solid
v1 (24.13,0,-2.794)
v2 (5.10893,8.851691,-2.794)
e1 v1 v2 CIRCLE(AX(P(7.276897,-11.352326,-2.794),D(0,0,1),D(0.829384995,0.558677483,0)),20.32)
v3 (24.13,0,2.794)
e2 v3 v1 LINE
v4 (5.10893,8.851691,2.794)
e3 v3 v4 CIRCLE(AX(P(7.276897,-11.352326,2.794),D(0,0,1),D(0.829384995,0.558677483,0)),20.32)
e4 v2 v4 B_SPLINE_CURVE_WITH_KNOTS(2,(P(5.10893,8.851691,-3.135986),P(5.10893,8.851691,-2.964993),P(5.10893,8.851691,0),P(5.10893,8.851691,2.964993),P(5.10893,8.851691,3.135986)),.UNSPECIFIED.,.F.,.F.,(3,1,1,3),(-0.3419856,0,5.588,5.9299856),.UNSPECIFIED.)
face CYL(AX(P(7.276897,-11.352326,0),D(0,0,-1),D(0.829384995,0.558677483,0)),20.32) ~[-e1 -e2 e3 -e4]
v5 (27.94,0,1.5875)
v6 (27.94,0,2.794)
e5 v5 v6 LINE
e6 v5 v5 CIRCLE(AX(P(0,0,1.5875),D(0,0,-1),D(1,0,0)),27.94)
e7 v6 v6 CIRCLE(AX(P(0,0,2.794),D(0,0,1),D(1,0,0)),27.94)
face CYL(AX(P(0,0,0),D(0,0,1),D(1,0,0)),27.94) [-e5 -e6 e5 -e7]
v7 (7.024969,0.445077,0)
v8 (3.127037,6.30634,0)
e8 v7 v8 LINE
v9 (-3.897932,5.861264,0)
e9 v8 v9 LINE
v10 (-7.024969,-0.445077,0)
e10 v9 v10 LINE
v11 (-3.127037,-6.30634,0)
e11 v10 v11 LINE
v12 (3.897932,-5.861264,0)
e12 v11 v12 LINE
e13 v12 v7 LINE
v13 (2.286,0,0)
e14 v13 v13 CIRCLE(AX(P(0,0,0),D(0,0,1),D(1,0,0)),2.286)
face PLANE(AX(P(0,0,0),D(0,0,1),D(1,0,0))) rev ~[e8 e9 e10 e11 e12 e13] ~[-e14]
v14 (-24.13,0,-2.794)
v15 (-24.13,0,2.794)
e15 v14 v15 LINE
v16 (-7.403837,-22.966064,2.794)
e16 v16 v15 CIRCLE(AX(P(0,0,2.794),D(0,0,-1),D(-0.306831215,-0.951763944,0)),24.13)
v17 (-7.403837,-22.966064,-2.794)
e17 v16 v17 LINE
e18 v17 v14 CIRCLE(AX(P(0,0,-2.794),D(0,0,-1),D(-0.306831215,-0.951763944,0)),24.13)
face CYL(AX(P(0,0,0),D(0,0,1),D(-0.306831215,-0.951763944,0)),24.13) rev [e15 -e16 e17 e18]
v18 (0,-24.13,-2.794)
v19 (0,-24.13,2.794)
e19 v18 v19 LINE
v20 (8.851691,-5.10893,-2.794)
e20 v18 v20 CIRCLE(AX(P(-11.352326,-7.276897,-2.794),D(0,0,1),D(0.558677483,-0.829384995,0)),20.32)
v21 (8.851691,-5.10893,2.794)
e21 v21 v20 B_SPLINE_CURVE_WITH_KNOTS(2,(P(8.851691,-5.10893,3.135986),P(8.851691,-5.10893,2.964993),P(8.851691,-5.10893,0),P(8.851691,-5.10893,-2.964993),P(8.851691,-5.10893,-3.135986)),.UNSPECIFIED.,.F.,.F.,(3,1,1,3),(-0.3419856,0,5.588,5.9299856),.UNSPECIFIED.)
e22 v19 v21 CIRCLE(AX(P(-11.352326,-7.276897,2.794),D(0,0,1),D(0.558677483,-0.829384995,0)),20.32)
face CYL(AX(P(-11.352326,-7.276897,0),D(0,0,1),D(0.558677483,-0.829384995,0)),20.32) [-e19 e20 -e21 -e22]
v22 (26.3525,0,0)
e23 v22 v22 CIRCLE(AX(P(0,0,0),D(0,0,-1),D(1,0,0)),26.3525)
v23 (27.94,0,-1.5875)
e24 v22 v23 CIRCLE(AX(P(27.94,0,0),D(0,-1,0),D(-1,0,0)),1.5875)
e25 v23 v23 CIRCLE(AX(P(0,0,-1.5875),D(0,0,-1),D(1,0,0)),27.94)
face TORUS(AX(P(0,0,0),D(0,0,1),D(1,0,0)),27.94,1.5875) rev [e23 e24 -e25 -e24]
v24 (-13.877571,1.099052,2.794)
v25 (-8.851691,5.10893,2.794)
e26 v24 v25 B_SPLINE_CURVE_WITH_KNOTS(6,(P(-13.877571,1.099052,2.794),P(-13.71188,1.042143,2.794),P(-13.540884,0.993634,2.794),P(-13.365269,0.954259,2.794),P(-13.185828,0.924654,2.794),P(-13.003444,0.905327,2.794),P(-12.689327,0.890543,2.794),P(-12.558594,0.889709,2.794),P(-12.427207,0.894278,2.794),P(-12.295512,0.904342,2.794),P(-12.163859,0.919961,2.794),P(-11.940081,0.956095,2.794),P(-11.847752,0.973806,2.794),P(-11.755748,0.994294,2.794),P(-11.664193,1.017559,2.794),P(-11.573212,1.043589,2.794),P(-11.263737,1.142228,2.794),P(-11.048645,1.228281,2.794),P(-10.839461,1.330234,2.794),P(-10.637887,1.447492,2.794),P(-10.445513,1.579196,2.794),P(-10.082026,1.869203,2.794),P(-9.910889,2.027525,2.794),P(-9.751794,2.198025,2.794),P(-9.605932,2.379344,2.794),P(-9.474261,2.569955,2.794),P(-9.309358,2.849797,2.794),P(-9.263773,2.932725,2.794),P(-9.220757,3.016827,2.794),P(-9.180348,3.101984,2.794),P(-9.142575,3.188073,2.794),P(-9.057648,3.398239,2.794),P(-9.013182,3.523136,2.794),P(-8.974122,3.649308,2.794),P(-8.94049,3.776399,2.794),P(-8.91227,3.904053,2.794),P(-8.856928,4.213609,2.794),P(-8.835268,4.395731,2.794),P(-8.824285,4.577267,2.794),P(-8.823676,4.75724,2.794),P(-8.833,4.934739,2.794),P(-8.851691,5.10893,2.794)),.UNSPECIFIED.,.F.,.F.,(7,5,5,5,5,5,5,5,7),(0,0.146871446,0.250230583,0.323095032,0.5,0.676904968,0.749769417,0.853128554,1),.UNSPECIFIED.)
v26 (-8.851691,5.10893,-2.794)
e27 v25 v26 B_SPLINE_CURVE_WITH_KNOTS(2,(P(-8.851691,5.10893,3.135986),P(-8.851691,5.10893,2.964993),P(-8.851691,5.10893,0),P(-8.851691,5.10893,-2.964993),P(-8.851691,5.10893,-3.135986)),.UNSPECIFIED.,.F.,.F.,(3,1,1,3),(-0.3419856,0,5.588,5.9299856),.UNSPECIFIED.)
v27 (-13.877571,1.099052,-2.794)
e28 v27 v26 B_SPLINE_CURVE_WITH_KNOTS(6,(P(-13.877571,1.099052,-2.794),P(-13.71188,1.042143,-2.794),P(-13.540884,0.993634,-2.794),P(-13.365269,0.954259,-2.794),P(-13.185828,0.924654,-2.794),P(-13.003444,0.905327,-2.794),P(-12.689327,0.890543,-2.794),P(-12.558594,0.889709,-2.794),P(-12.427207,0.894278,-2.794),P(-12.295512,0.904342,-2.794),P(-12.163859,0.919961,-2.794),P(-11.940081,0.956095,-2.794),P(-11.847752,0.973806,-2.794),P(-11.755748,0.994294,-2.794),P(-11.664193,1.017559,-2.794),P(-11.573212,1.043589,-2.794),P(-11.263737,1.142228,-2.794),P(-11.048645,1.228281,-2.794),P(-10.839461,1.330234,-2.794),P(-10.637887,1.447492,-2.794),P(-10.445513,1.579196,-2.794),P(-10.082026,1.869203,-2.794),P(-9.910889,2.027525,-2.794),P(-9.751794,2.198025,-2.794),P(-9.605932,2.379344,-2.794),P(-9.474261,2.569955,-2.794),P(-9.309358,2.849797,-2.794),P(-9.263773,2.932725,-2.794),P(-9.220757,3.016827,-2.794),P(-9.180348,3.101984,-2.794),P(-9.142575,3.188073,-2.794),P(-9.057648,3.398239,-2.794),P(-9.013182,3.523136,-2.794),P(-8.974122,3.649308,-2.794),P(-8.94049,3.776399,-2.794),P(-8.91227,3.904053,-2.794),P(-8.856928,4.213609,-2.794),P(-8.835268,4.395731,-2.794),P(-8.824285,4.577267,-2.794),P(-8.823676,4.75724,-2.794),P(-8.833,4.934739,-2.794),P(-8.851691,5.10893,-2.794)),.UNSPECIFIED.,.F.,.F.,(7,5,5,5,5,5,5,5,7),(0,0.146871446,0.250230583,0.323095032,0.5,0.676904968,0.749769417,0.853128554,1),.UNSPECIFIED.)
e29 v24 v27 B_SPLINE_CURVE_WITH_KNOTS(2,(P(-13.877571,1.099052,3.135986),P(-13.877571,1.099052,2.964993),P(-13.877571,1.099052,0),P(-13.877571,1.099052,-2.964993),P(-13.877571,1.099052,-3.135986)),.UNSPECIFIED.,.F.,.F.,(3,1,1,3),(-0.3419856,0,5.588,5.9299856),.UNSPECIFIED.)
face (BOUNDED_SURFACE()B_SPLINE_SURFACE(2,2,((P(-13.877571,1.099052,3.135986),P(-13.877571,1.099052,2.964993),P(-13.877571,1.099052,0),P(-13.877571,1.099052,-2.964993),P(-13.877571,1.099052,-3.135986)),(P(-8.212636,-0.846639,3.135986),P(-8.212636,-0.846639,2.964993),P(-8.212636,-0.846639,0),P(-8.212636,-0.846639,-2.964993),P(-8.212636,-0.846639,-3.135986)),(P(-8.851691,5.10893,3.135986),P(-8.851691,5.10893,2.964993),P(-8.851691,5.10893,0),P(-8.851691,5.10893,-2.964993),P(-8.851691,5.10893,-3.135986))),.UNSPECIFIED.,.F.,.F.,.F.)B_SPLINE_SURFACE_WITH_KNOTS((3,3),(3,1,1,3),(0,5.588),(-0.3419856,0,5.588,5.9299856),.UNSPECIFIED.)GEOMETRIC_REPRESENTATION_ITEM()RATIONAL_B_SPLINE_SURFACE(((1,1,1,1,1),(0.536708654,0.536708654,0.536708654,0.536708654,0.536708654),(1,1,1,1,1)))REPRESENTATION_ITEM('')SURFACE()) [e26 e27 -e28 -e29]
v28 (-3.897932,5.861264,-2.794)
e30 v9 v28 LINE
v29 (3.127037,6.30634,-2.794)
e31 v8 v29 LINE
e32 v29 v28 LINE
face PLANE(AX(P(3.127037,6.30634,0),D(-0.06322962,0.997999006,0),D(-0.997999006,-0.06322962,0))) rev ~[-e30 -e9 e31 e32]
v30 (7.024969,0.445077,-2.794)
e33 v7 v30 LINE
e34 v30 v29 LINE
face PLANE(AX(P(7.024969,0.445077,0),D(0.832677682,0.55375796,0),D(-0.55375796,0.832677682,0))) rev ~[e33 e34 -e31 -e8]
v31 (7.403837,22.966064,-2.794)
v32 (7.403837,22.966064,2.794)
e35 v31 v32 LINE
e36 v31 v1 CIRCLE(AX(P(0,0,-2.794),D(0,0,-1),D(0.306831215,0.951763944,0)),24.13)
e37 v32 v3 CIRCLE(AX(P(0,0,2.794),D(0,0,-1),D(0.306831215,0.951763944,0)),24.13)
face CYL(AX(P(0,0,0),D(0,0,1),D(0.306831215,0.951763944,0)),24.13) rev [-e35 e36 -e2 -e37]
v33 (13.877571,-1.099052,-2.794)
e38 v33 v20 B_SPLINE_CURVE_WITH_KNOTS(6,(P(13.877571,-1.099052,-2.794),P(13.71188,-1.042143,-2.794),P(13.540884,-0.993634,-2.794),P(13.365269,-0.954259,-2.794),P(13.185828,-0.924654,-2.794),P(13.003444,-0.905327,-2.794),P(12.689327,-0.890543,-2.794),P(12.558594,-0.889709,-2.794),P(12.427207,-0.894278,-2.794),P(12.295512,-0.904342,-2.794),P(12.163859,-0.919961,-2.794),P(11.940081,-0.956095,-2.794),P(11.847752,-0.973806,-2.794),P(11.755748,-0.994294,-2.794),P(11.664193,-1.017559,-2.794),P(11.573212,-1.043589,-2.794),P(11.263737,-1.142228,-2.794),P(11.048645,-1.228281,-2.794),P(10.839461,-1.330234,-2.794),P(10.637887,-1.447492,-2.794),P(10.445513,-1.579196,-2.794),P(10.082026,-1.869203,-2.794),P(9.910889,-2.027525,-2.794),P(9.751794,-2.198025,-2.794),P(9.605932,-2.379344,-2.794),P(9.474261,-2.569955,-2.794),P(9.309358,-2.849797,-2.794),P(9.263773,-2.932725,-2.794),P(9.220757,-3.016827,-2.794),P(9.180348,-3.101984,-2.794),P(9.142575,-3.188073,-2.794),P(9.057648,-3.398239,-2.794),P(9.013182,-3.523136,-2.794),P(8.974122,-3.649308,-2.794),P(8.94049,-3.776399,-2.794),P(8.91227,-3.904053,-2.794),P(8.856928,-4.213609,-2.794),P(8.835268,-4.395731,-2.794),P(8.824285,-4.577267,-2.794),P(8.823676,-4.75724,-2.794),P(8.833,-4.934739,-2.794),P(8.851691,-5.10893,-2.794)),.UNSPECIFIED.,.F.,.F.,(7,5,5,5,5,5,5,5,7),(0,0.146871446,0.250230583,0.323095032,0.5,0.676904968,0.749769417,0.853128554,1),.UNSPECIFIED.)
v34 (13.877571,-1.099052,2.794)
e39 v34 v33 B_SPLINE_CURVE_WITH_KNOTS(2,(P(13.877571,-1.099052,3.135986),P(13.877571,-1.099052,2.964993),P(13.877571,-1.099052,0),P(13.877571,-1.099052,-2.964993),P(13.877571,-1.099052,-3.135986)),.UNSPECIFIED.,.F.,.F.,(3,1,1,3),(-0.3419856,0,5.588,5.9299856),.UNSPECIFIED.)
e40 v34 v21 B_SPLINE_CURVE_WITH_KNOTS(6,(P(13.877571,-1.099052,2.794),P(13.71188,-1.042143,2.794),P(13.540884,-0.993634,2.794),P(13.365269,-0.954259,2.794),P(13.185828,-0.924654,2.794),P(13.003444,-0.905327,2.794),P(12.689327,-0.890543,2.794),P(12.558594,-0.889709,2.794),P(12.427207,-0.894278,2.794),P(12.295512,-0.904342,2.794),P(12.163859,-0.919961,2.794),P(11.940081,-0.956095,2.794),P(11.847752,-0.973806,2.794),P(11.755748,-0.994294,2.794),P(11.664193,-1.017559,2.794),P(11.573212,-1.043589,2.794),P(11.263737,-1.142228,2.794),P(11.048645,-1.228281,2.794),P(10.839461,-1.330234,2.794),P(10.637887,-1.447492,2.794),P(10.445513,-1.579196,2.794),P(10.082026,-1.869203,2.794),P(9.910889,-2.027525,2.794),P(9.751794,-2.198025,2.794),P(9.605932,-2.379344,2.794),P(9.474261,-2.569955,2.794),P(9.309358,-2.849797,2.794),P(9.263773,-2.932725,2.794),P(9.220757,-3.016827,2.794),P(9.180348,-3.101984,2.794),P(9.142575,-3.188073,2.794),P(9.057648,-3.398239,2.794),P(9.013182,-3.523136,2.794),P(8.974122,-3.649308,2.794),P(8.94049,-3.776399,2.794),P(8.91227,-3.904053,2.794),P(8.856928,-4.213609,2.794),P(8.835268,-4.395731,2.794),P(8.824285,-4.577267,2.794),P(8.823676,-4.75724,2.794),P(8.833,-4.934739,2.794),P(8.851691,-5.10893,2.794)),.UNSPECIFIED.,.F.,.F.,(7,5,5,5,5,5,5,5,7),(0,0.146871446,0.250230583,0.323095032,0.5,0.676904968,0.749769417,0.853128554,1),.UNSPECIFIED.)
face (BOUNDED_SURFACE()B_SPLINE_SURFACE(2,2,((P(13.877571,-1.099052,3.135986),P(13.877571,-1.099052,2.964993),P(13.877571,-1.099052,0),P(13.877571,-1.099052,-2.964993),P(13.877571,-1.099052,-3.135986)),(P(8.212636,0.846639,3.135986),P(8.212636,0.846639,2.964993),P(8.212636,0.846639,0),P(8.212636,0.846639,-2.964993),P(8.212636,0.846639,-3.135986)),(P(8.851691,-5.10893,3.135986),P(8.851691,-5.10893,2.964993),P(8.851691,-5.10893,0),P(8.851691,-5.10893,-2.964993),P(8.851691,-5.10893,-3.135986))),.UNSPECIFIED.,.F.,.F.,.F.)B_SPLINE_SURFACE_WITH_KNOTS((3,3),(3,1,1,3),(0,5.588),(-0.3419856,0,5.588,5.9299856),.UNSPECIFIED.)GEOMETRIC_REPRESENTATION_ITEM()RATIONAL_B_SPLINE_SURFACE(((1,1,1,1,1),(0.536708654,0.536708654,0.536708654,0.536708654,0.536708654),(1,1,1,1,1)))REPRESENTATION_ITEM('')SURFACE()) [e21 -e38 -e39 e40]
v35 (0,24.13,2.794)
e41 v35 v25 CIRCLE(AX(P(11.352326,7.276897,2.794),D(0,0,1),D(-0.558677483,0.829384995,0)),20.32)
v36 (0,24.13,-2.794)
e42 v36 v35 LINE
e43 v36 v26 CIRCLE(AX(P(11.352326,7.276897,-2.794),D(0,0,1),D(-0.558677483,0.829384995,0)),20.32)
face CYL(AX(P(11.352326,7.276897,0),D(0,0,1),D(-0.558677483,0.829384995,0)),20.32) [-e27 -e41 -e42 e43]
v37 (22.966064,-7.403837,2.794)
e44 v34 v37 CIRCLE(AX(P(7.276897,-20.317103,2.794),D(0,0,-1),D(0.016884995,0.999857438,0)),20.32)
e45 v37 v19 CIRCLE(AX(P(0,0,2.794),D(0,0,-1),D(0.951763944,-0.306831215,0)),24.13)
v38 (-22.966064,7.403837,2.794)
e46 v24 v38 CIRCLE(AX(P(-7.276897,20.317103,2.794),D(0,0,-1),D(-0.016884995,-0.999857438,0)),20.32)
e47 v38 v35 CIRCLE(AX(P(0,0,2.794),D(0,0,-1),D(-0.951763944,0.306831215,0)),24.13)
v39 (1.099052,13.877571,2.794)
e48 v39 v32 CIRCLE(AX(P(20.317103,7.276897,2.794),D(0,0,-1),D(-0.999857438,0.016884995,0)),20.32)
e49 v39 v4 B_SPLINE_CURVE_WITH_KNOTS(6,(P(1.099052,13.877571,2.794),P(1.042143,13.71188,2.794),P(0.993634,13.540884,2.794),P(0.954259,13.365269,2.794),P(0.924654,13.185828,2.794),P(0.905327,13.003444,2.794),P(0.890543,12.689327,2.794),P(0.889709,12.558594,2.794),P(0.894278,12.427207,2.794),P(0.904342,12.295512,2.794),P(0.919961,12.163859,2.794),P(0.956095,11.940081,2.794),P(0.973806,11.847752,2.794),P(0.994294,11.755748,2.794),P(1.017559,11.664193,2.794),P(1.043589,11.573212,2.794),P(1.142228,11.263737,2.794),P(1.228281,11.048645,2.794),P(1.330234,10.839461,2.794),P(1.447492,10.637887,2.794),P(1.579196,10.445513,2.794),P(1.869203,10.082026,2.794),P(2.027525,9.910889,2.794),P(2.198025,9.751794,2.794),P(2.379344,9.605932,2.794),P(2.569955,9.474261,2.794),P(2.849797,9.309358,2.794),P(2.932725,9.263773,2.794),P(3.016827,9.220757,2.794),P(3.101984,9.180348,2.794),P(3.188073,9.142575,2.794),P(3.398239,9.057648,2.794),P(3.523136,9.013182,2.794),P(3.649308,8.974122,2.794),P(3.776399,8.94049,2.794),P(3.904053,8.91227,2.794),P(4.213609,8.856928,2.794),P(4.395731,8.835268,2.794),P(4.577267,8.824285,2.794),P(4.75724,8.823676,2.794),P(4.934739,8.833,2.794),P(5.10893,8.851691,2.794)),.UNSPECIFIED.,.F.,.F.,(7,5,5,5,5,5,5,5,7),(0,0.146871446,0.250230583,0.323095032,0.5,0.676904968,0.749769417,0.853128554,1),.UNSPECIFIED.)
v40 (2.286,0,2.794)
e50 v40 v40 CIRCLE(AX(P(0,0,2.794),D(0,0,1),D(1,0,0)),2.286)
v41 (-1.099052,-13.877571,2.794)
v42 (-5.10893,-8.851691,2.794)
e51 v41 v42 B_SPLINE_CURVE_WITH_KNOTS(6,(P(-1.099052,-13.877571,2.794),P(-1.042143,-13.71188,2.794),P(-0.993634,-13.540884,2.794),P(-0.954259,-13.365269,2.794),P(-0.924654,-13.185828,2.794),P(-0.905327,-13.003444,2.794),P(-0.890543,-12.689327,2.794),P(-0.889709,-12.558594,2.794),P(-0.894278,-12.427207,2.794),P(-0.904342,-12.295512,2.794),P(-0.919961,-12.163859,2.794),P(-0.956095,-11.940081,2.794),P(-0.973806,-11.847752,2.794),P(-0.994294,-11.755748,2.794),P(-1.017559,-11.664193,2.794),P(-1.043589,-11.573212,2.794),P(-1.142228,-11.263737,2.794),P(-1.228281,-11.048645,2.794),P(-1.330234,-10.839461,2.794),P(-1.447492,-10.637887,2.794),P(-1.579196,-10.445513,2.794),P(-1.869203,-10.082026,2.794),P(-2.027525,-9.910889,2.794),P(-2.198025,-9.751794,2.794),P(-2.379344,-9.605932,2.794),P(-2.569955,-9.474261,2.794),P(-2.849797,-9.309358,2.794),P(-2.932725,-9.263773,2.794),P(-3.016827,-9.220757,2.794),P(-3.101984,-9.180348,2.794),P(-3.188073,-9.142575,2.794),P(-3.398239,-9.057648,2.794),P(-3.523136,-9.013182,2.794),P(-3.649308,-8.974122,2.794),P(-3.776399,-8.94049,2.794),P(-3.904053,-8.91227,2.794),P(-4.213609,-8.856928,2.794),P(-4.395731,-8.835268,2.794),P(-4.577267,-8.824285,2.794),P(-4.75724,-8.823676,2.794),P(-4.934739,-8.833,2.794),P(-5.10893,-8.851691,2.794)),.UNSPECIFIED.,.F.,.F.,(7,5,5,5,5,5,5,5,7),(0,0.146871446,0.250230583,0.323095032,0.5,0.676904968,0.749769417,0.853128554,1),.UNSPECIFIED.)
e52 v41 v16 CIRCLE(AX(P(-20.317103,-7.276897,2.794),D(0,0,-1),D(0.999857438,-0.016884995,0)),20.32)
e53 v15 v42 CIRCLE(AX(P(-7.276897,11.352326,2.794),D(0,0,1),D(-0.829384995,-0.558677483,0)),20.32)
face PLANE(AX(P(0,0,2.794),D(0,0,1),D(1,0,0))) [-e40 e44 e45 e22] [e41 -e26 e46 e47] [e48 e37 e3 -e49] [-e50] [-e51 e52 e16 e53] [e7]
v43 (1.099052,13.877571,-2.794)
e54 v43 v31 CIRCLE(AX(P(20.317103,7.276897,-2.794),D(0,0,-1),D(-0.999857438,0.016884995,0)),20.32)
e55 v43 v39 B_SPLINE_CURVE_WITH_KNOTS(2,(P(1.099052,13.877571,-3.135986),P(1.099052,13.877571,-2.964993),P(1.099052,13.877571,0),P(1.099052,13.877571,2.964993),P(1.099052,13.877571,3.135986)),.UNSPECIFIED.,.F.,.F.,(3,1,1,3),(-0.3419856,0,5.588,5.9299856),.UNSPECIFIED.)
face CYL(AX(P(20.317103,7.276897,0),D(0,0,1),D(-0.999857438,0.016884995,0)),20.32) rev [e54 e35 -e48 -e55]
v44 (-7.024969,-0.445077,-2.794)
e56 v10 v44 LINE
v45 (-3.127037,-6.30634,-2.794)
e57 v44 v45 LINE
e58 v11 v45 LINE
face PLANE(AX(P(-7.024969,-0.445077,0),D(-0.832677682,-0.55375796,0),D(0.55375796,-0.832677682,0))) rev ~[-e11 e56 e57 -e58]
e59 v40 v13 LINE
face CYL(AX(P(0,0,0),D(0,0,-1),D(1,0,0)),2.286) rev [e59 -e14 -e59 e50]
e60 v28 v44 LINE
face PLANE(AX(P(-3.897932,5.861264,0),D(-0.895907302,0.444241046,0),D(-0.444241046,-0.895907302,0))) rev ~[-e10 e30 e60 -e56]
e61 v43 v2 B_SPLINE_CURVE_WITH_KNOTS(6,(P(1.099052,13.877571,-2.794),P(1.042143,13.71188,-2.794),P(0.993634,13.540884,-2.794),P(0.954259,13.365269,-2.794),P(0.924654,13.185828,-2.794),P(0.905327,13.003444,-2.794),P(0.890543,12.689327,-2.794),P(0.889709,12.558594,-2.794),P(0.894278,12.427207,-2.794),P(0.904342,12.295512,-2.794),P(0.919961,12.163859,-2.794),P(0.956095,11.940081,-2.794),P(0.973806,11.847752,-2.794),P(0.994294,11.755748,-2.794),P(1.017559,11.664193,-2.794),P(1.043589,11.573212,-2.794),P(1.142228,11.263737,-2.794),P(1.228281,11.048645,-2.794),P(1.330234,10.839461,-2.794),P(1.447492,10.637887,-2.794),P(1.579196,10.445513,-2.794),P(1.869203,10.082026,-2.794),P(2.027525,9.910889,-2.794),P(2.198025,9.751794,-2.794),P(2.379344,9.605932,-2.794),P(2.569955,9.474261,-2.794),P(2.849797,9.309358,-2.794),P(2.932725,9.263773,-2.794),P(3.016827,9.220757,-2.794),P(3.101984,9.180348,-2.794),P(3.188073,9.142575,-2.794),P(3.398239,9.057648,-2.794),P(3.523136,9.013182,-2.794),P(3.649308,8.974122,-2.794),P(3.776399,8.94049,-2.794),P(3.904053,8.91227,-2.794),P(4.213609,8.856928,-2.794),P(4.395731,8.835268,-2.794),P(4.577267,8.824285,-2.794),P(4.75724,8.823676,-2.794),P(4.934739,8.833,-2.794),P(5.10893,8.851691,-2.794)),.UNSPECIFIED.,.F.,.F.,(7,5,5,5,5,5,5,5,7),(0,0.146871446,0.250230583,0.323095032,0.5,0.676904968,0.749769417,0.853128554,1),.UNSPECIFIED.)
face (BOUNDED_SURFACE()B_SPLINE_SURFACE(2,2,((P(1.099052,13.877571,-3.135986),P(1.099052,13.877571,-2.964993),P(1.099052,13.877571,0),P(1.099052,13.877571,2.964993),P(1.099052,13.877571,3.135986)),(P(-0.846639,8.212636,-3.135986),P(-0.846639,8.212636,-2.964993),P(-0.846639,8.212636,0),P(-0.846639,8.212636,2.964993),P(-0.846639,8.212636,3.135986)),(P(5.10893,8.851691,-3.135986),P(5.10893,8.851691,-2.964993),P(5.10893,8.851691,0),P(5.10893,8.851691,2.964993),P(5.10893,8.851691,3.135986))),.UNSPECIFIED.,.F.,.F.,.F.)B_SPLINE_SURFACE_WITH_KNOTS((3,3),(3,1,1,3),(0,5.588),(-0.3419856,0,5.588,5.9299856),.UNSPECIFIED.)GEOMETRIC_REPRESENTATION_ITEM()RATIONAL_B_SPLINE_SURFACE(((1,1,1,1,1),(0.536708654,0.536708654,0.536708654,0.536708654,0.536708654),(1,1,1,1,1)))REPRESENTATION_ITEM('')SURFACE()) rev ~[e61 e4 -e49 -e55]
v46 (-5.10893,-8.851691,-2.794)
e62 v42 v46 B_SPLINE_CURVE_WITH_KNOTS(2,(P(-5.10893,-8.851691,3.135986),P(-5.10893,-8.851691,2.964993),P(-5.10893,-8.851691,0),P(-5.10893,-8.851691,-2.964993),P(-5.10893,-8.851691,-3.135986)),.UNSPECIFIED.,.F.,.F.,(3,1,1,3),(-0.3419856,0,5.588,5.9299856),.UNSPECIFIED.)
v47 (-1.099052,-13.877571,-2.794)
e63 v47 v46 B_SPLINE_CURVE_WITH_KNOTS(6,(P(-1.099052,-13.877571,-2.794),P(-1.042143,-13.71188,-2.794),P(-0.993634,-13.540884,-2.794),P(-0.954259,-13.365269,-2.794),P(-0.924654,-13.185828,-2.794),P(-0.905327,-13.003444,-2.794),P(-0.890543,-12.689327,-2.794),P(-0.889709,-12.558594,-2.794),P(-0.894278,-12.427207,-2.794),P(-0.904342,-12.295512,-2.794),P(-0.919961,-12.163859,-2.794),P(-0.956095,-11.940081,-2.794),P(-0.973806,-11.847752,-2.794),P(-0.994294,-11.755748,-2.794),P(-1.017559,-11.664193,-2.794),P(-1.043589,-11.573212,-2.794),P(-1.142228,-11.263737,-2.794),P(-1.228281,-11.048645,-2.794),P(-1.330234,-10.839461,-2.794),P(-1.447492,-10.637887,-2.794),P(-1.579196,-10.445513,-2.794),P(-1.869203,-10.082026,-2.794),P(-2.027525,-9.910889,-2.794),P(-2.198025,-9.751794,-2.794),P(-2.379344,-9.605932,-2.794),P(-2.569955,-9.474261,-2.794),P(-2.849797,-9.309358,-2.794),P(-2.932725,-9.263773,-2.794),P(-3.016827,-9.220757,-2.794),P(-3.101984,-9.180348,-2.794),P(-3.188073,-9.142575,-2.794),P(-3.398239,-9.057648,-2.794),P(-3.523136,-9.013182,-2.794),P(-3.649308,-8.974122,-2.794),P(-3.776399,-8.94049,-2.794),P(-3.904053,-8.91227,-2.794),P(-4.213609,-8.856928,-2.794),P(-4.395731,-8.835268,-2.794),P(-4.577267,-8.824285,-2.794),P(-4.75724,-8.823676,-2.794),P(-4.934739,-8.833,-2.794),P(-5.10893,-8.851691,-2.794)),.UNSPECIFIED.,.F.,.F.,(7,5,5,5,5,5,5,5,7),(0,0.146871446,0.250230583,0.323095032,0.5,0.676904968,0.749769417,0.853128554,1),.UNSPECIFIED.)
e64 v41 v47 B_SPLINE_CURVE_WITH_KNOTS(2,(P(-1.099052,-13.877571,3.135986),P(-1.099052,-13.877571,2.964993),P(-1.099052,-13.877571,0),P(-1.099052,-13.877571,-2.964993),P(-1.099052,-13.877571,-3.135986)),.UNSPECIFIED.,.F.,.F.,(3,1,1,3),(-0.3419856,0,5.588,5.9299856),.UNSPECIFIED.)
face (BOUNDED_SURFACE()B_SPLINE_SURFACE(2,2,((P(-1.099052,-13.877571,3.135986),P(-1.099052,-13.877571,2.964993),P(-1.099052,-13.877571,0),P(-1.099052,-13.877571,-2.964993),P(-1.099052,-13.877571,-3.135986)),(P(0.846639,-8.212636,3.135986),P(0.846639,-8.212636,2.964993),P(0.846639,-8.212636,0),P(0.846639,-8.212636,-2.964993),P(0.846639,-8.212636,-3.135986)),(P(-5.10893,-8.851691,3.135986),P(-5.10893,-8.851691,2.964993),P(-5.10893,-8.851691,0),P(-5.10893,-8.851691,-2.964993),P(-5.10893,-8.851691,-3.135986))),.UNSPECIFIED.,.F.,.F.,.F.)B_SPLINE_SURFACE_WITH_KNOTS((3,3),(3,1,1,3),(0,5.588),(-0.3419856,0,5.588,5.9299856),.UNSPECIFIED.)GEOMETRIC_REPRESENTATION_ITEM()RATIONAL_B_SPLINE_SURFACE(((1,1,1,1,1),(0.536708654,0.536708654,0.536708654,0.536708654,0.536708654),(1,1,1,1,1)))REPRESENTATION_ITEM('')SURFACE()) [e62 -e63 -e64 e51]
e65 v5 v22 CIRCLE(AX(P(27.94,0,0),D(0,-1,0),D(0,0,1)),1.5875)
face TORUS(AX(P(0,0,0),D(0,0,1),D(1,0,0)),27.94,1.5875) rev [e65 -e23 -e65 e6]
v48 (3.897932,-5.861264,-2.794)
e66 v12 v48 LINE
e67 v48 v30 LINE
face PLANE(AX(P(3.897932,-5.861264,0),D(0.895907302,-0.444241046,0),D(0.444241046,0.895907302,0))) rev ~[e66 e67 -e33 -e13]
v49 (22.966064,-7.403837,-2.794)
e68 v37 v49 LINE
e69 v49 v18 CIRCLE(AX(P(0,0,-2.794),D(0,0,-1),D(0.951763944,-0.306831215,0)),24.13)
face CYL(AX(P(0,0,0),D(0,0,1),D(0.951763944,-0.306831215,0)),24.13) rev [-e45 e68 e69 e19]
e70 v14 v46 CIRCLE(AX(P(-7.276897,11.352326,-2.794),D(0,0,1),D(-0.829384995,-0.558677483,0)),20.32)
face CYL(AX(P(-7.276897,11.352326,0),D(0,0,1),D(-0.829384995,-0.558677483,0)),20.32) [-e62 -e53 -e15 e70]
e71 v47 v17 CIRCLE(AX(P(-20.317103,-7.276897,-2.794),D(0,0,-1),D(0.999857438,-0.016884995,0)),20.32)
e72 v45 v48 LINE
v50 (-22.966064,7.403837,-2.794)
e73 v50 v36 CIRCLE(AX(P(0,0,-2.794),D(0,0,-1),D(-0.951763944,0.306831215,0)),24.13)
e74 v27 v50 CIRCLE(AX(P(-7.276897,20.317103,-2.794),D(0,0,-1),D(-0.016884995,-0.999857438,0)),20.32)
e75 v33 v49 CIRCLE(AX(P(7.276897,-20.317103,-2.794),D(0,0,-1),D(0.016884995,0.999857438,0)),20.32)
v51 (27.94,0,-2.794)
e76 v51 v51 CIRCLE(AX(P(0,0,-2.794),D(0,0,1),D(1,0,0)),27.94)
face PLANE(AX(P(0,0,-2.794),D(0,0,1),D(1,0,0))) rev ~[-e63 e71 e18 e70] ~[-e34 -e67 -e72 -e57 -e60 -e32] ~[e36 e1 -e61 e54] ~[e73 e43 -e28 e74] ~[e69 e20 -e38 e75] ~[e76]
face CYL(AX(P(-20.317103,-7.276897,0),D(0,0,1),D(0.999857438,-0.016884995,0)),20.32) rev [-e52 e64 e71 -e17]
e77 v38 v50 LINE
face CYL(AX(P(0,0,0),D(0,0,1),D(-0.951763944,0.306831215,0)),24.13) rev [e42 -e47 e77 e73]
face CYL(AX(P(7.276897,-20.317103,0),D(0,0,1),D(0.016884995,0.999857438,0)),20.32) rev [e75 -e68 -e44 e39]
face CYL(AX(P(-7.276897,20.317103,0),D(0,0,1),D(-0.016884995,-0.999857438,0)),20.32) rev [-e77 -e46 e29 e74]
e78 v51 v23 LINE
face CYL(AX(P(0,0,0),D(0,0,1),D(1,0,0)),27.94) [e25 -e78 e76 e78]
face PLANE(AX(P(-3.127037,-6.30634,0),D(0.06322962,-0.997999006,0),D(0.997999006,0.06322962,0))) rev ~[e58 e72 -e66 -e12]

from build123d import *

# Parameters (mm, degrees)
F0_R     = 27.94
F0_R_2   = 2.286
F1_DEPTH = 2.794
F4_R     = 3.81
F5_DEPTH = 12.7


# Not quite as in the source:
# - a feature names something its author has since deleted; it is built from what else it names


with BuildPart() as f1:
    # F0 (on Top) → F1 (new body, symmetric)
    with BuildSketch(Plane.XY):
        Circle(F0_R)
        with BuildLine():
            ThreePointArc((7.4038372238, 22.9660639719), (19.5052748277, 14.2056732996), (24.13, 0))
            ThreePointArc((24.13, 0), (23.8372400211, -3.7473841781), (22.9660639719, -7.4038372238))
            ThreePointArc((22.9660639719, -7.4038372238), (14.2056732996, -19.5052748277), (0, -24.13))
            ThreePointArc((0, -24.13), (-3.7473841781, -23.8372400211), (-7.4038372238, -22.9660639719))
            ThreePointArc((-7.4038372238, -22.9660639719), (-19.5052748277, -14.2056732996), (-24.13, 0))
            ThreePointArc((-24.13, 0), (-23.8372400211, 3.7473841781), (-22.9660639719, 7.4038372238))
            ThreePointArc((-22.9660639719, 7.4038372238), (-14.2056732996, 19.5052748277), (0, 24.13))
            ThreePointArc((0, 24.13), (3.7473841781, 23.8372400211), (7.4038372238, 22.9660639719))
        make_face(mode=Mode.SUBTRACT)
        with BuildLine():
            ThreePointArc((22.9660639719, -7.4038372238), (23.8372400211, -3.7473841781), (24.13, 0))
            ThreePointArc((24.13, 0), (13.395886303, 8.0244732927), (0, 7.62))
            ThreePointArc((0, 7.62), (2.0157431704, 16.1065414645), (7.4038372238, 22.9660639719))
            ThreePointArc((7.4038372238, 22.9660639719), (3.7473841781, 23.8372400211), (0, 24.13))
            ThreePointArc((0, 24.13), (-8.0244732927, 13.395886303), (-7.62, 0))
            ThreePointArc((-7.62, 0), (-16.1065414645, 2.0157431704), (-22.9660639719, 7.4038372238))
            ThreePointArc((-22.9660639719, 7.4038372238), (-23.8372400211, 3.7473841781), (-24.13, 0))
            ThreePointArc((-24.13, 0), (-13.395886303, -8.0244732927), (0, -7.62))
            ThreePointArc((0, -7.62), (-2.0157431704, -16.1065414645), (-7.4038372238, -22.9660639719))
            ThreePointArc((-7.4038372238, -22.9660639719), (-3.7473841781, -23.8372400211), (0, -24.13))
            ThreePointArc((0, -24.13), (8.0244732927, -13.395886303), (7.62, 0))
            ThreePointArc((7.62, 0), (16.1065414645, -2.0157431704), (22.9660639719, -7.4038372238))
        make_face()
        Polygon((3.1270369256, 6.3063403068), (7.0249693735, 0.4450767373), (3.8979324478, -5.8612635696), (-3.1270369256, -6.3063403068), (-7.0249693735, -0.4450767373), (-3.8979324478, 5.8612635696), align=None, mode=Mode.SUBTRACT)
        Polygon((3.8979324478, -5.8612635696), (7.0249693735, 0.4450767373), (3.1270369256, 6.3063403068), (-3.8979324478, 5.8612635696), (-7.0249693735, -0.4450767373), (-3.1270369256, -6.3063403068), align=None)
        Circle(F0_R_2, mode=Mode.SUBTRACT)
    extrude(amount=F1_DEPTH, both=True)

    # F2 (on Front) → F3 (revolve, cut)
    with BuildSketch(Plane.XZ):
        with BuildLine():
            Line((27.94, -1.5875), (27.94, 0))
            Line((27.94, 0), (26.3525, 0))
            ThreePointArc((26.3525, 0), (26.8174679849, -1.1225320151), (27.94, -1.5875))
        make_face()
        with BuildLine():
            Line((26.3525, 0), (27.94, 0))
            Line((27.94, 0), (27.94, 1.5875))
            ThreePointArc((27.94, 1.5875), (26.8174679849, 1.1225320151), (26.3525, 0))
        make_face()
    revolve(axis=Axis((0, 0, -0.2561928704), (0, 0, -1)), mode=Mode.SUBTRACT)

    # F4
    f4_edges = [f1.edges().sort_by_distance(p)[0] for p in [
        (-7.62, 0, 0),
        (0, 7.62, 0),
        (7.62, 0, 0),
        (0, -7.62, 0),
    ]]
    fillet(f4_edges, radius=F4_R)

    # F0 (on Top) → F5 (cut)
    with BuildSketch(Plane.XY):
        Polygon((3.8979324478, -5.8612635696), (7.0249693735, 0.4450767373), (3.1270369256, 6.3063403068), (-3.8979324478, 5.8612635696), (-7.0249693735, -0.4450767373), (-3.1270369256, -6.3063403068), align=None)
        Circle(F0_R_2, mode=Mode.SUBTRACT)
    extrude(amount=-F5_DEPTH, mode=Mode.SUBTRACT)


solid = f1.part
